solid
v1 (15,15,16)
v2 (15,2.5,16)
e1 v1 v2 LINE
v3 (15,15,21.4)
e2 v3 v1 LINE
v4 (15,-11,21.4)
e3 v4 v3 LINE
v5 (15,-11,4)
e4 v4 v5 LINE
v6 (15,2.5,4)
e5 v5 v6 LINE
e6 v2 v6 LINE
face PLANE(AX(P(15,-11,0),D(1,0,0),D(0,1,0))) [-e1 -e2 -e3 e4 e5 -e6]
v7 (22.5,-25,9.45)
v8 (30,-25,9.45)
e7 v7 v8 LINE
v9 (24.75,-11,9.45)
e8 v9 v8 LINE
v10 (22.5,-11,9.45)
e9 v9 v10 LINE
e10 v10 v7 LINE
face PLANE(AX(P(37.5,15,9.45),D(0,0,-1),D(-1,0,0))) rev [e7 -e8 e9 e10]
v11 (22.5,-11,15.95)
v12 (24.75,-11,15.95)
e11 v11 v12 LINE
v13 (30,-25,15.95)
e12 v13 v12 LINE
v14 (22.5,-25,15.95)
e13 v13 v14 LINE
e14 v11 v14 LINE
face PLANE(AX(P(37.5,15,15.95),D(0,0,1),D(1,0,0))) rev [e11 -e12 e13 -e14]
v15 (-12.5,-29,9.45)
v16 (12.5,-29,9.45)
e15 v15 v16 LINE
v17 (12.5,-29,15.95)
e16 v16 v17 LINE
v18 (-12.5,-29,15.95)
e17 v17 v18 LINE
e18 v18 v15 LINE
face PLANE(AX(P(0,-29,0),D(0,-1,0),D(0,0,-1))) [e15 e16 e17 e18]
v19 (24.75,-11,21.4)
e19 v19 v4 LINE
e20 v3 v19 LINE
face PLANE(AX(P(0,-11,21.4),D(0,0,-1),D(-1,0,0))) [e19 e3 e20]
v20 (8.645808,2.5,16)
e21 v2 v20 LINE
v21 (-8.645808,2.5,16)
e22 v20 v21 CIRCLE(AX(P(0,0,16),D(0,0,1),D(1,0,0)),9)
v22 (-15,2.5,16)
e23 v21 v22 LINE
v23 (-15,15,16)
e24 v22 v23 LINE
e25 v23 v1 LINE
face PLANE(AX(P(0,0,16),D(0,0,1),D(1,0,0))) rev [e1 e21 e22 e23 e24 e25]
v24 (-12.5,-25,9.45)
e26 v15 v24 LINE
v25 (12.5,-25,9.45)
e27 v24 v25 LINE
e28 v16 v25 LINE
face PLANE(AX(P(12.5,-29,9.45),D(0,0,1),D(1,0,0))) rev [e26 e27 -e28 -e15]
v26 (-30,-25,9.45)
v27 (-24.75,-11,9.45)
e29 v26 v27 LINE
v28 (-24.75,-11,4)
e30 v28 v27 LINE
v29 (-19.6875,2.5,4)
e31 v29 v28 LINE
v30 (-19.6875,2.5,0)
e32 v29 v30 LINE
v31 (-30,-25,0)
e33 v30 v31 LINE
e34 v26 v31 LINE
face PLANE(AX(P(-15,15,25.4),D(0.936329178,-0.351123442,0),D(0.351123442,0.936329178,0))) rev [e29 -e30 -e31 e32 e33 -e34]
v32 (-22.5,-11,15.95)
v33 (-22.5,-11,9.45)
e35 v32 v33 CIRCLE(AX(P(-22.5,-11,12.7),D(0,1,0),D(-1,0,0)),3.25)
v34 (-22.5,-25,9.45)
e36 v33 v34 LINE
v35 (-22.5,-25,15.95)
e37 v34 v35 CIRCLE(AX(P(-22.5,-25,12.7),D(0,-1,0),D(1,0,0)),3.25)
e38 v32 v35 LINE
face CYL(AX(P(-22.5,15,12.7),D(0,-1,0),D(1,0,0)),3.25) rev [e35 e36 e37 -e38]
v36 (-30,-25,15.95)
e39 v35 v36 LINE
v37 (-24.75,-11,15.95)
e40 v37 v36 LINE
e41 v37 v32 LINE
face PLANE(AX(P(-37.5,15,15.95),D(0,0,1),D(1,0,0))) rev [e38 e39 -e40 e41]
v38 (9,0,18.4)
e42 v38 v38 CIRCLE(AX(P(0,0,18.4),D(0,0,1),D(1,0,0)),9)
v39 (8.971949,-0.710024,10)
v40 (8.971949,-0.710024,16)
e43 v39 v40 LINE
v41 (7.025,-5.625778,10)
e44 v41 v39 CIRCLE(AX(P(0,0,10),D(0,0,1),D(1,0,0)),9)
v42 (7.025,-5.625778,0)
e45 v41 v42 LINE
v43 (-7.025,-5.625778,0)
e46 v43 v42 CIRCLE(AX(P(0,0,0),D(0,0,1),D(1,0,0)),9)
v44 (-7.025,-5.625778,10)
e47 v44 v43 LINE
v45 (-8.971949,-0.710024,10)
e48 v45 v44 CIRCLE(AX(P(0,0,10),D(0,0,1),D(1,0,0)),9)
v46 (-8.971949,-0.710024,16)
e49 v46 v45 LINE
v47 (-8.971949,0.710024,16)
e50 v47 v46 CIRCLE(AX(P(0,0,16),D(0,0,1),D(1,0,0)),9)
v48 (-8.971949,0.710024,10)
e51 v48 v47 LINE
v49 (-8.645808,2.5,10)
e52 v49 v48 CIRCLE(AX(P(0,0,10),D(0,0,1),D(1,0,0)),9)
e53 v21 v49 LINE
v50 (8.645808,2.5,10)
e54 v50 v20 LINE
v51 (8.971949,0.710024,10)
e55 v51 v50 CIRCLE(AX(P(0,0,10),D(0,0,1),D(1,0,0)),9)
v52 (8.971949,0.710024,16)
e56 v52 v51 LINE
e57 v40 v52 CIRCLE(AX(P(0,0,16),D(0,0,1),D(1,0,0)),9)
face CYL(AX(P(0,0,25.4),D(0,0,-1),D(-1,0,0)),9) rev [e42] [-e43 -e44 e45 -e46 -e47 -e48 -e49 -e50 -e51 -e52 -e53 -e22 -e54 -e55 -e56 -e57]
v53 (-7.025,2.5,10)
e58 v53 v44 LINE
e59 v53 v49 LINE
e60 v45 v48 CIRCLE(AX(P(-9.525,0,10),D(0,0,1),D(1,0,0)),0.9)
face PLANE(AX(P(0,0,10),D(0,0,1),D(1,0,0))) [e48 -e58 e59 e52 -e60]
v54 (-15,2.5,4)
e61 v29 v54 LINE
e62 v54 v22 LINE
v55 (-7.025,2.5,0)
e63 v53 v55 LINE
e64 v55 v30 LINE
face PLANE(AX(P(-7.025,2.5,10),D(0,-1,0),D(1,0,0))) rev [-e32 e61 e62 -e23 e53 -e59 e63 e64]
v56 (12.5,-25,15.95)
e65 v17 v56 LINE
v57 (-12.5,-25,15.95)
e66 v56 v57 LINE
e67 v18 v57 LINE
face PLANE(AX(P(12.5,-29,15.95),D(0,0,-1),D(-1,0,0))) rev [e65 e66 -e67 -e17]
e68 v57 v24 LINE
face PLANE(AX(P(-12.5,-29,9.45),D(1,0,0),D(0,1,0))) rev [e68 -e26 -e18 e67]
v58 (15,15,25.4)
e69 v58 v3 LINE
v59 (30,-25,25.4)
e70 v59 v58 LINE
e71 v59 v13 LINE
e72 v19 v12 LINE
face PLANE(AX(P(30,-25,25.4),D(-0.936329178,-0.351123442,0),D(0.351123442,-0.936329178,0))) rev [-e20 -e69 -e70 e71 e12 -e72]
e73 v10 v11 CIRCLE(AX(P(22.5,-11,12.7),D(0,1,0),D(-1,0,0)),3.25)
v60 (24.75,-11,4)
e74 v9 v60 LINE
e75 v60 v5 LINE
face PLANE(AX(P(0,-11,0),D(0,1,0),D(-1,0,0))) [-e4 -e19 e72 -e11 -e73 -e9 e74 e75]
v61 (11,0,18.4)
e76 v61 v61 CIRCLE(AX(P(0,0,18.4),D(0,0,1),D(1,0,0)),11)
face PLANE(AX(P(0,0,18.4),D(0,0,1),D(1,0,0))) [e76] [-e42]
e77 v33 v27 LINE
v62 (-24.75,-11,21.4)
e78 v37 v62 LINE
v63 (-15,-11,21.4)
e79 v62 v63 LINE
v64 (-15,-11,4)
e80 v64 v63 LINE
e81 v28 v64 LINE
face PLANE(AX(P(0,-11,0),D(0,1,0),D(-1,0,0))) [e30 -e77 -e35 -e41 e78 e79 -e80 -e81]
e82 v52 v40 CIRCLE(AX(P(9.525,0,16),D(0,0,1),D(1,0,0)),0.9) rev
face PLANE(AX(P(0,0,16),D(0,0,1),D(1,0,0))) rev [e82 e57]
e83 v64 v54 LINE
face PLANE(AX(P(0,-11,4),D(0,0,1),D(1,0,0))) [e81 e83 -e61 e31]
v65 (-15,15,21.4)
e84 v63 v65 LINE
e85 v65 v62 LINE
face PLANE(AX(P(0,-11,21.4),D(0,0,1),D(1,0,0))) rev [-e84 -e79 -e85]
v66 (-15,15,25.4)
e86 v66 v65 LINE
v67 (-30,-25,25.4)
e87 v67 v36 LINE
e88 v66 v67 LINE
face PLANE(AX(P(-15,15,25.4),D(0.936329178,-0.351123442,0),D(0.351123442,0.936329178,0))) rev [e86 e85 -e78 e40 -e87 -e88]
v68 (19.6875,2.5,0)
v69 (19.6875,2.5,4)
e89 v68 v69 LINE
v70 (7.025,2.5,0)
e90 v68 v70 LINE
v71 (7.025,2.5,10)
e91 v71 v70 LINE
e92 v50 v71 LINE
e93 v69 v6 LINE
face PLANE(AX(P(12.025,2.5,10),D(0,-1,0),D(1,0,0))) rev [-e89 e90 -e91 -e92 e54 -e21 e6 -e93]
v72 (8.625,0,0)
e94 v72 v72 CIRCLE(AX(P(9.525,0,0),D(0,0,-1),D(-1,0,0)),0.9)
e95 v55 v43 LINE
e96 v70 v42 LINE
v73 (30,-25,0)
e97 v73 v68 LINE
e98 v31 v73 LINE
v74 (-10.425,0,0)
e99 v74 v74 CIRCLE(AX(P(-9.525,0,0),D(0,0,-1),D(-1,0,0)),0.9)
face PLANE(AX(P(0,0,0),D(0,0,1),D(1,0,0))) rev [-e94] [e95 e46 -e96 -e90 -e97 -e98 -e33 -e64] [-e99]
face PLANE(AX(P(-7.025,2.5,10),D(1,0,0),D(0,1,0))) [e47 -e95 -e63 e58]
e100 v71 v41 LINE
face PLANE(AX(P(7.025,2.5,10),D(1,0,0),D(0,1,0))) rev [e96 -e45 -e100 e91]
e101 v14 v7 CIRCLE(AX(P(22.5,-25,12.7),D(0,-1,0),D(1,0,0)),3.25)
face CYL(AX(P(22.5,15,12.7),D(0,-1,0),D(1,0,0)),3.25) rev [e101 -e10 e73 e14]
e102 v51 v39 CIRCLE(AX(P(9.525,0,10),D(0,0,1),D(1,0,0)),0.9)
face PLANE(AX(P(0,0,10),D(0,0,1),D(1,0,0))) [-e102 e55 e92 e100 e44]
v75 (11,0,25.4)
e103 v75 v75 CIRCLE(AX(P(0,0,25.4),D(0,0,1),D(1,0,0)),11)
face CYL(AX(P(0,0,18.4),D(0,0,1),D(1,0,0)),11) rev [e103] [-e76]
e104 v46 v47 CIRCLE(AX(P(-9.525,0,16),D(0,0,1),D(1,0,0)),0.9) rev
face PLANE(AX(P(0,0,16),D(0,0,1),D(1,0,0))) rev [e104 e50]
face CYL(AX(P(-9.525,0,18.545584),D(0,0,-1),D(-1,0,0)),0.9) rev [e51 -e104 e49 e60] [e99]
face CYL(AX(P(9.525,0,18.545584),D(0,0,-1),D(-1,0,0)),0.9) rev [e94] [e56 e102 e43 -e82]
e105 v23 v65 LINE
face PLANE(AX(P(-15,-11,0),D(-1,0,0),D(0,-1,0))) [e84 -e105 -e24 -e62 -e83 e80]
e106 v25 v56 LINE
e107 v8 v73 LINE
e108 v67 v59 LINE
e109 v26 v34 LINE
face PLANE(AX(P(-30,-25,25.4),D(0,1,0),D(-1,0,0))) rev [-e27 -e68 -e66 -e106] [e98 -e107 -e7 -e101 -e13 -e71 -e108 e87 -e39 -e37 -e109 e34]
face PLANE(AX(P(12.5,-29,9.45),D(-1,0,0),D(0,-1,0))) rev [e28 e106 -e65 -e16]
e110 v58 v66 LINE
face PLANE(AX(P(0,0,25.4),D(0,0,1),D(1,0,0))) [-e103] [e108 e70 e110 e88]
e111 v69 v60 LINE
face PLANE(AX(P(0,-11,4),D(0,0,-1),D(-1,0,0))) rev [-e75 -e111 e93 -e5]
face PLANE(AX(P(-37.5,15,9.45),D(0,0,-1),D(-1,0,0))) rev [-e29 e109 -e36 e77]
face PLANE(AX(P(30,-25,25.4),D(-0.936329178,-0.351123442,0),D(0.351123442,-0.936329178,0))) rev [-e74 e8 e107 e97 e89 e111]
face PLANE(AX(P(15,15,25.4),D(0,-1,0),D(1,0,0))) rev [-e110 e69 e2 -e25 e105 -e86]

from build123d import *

# Parameters (mm, degrees)
SKETCH3_R              = 9
BOSS_EXTRUDE3_DEPTH    = 25.4
CUT_EXTRUDE2_START     = -26
CUT_EXTRUDE2_OUTLINE_W = 15
CUT_EXTRUDE2_OUTLINE_H = 17.4
CUT_EXTRUDE2_DEPTH     = 26
SKETCH5_W              = 5
SKETCH5_H              = 27.5
BOSS_EXTRUDE4_DEPTH    = 10
SKETCH6_W              = 60
SKETCH6_H              = 12.5
CUT_EXTRUDE3_DEPTH     = 16
SKETCH7_W              = 25
SKETCH7_H              = 6.5
BOSS_EXTRUDE5_DEPTH    = 4
CUT_EXTRUDE4_DEPTH     = 57.081726079
SKETCH9_R              = 11
CUT_EXTRUDE5_DEPTH     = 7
CUT_EXTRUDE6_START     = -16
SKETCH5_3_R            = 0.9
CUT_EXTRUDE6_DEPTH     = 16


# Read off the part's stored shape, not the designer's step: Cut-Extrude2
with BuildPart() as part:
    # Sketch3 → Boss-Extrude3 (new body)
    with BuildSketch(Plane.XY):
        Polygon((-30, -25), (30, -25), (15, 15), (-15, 15), align=None)
        Circle(SKETCH3_R, mode=Mode.SUBTRACT)
    extrude(amount=BOSS_EXTRUDE3_DEPTH)

    # Cut-Extrude2 outline → Cut-Extrude2 (cut)
    with BuildSketch(Plane(origin=(0, 15, 0), x_dir=(1, 0, 0), z_dir=(0, 1, 0)).offset(CUT_EXTRUDE2_START)):
        with Locations((22.5, -12.7)):
            Rectangle(CUT_EXTRUDE2_OUTLINE_W, CUT_EXTRUDE2_OUTLINE_H)
        with Locations((-22.5, -12.7)):
            Rectangle(CUT_EXTRUDE2_OUTLINE_W, CUT_EXTRUDE2_OUTLINE_H)
    extrude(amount=CUT_EXTRUDE2_DEPTH, mode=Mode.SUBTRACT)

    # Sketch5 → Boss-Extrude4 (add)
    with BuildSketch(Plane(origin=(0, 0, 0), x_dir=(-1, 0, 0), z_dir=(0, 0, -1))):
        with Locations((-9.525, -11.25)):
            Rectangle(SKETCH5_W, SKETCH5_H)
        with Locations((9.525, -11.25)):
            Rectangle(SKETCH5_W, SKETCH5_H)
    extrude(amount=-BOSS_EXTRUDE4_DEPTH)

    # Sketch6 → Cut-Extrude3 (cut)
    with BuildSketch(Plane(origin=(0, 0, 0), x_dir=(-1, 0, 0), z_dir=(0, 0, -1))):
        with Locations((0, 8.75)):
            Rectangle(SKETCH6_W, SKETCH6_H)
    extrude(amount=-CUT_EXTRUDE3_DEPTH, mode=Mode.SUBTRACT)

    # Sketch7 → Boss-Extrude5 (add)
    with BuildSketch(Plane.XZ.offset(25)):
        with Locations((0, 12.7)):
            Rectangle(SKETCH7_W, SKETCH7_H)
    extrude(amount=BOSS_EXTRUDE5_DEPTH)

    # Sketch8 → Cut-Extrude4 (cut, through all)
    with BuildSketch(Plane.XZ.offset(25)):
        with BuildLine():
            Line((37.5, 9.45), (22.5, 9.45))
            ThreePointArc((22.5, 9.45), (19.25, 12.7), (22.5, 15.95))
            Line((22.5, 15.95), (37.5, 15.95))
            ThreePointArc((37.5, 15.95), (40.75, 12.7), (37.5, 9.45))
        make_face()
        with BuildLine():
            Line((-37.5, 15.95), (-22.5, 15.95))
            ThreePointArc((-22.5, 15.95), (-19.25, 12.7), (-22.5, 9.45))
            Line((-22.5, 9.45), (-37.5, 9.45))
            ThreePointArc((-37.5, 9.45), (-40.75, 12.7), (-37.5, 15.95))
        make_face()
    extrude(amount=-CUT_EXTRUDE4_DEPTH, mode=Mode.SUBTRACT)

    # Sketch9 → Cut-Extrude5 (cut)
    with BuildSketch(Plane.XY.offset(25.4)):
        Circle(SKETCH9_R)
    extrude(amount=-CUT_EXTRUDE5_DEPTH, mode=Mode.SUBTRACT)

    # Sketch5<3> → Cut-Extrude6 (cut)
    with BuildSketch(Plane(origin=(0, 0, 0), x_dir=(-1, 0, 0), z_dir=(0, 0, -1)).offset(CUT_EXTRUDE6_START)):
        with Locations((9.525, 0)):
            Circle(SKETCH5_3_R)
        with Locations((-9.525, 0)):
            Circle(SKETCH5_3_R)
    extrude(amount=CUT_EXTRUDE6_DEPTH, mode=Mode.SUBTRACT)


solid = part.part
